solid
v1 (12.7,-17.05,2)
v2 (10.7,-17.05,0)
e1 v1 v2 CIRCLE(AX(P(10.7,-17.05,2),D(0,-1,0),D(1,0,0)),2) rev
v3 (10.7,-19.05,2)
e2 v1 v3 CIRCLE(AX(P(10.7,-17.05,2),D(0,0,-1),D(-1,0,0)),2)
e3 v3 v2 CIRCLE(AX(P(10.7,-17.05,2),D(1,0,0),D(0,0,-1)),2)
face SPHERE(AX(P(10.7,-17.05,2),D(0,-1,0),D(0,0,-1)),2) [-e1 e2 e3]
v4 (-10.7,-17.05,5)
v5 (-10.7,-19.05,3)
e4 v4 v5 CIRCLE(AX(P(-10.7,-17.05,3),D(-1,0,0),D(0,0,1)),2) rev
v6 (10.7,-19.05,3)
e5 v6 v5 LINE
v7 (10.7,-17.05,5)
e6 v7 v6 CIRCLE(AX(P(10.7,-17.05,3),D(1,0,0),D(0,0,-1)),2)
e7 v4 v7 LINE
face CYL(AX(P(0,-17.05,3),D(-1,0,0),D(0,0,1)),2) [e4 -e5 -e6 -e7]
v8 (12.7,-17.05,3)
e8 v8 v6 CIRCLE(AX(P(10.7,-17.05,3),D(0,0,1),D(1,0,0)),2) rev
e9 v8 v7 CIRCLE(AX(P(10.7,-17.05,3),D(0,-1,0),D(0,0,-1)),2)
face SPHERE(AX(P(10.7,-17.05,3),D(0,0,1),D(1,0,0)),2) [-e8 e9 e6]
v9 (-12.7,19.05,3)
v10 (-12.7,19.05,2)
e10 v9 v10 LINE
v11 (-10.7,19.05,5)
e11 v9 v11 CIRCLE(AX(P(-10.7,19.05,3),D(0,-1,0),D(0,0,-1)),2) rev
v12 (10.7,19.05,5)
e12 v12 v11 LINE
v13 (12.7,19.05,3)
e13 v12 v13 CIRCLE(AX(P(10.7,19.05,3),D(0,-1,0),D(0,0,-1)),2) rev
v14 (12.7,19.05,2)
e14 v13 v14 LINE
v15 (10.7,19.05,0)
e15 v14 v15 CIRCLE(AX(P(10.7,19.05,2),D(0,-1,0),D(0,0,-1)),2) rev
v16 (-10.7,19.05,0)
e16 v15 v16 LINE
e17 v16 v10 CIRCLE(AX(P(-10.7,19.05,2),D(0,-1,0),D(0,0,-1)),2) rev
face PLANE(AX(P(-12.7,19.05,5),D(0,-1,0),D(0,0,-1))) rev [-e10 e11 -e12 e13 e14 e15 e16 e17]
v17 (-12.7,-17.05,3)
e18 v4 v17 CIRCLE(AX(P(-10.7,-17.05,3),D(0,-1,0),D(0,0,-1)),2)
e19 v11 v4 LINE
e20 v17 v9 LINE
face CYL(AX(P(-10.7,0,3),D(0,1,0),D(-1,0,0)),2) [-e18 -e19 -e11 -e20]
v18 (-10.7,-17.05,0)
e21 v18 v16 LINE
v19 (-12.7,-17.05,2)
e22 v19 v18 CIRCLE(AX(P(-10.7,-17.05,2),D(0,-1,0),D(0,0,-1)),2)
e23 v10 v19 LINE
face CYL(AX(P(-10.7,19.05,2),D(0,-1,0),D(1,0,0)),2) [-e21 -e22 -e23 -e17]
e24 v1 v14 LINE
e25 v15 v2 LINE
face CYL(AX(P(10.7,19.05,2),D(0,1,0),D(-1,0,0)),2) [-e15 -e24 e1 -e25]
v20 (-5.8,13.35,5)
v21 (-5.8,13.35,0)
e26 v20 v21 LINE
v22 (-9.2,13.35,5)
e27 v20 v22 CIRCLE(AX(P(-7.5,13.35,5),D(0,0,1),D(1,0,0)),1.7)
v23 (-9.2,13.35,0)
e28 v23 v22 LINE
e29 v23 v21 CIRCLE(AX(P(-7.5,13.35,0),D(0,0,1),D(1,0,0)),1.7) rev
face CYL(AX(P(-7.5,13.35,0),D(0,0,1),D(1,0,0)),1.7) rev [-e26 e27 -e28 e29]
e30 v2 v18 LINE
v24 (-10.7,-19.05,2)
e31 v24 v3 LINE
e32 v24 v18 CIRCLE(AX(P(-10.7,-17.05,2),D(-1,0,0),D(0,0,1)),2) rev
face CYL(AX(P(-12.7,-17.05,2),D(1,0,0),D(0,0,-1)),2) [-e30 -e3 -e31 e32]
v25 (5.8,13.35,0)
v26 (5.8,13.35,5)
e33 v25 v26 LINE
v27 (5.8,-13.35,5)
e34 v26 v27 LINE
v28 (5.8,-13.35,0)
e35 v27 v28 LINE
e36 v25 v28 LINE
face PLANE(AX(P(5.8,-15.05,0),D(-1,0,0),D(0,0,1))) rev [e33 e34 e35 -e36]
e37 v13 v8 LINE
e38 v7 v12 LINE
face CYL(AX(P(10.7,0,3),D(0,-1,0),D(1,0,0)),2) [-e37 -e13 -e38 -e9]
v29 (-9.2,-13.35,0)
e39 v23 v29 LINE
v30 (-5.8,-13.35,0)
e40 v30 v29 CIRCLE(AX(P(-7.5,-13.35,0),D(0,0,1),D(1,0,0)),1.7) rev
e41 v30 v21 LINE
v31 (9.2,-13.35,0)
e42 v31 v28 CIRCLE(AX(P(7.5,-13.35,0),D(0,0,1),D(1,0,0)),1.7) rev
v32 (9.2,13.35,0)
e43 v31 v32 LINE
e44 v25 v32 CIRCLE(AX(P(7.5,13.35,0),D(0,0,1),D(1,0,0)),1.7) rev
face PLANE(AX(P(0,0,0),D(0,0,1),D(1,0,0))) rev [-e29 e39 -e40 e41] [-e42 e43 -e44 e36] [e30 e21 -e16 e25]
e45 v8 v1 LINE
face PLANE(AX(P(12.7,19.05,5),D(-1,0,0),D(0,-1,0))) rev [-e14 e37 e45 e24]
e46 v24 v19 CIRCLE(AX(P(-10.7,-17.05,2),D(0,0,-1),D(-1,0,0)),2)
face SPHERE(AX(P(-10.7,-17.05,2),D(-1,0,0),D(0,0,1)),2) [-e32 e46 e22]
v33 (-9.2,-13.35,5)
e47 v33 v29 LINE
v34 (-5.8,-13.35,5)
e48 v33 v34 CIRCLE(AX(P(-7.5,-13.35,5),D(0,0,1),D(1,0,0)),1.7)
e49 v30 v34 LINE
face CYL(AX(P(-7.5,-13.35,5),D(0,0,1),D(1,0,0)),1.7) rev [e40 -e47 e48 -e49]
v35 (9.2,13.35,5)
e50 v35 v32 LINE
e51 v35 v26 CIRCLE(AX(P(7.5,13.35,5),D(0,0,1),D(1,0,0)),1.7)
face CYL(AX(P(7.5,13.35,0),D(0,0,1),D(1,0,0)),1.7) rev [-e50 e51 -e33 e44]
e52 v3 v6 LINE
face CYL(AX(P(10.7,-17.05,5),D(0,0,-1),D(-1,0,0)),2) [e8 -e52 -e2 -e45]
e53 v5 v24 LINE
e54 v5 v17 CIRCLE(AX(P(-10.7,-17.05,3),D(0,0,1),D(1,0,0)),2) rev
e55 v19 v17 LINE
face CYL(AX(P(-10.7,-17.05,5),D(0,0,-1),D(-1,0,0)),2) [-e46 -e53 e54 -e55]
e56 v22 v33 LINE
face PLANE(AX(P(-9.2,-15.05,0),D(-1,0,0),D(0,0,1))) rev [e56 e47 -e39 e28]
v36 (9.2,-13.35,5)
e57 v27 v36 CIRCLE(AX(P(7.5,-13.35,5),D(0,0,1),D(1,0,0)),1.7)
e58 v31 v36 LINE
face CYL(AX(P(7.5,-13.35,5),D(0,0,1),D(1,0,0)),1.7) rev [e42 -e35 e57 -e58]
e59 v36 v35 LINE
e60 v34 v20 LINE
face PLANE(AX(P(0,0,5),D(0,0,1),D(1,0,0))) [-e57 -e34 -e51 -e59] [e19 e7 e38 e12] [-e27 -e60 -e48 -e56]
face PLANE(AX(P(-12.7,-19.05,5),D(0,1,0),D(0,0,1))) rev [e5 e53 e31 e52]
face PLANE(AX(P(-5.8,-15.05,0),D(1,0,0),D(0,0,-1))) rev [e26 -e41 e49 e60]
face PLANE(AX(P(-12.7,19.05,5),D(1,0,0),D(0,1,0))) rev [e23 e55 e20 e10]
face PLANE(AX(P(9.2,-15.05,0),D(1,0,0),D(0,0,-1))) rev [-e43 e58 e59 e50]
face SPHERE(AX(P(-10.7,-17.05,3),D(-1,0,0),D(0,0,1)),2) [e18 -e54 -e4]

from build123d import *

# Parameters (mm, degrees)
SKETCH1_W           = 25.4
SKETCH1_H           = 38.1
BOSS_EXTRUDE1_DEPTH = 5
SKETCH2_W           = 3.4
SKETCH2_H           = 30.1
CUT_EXTRUDE1_DEPTH  = 24.434856518
FILLET1_R           = 1.7
FILLET2_R           = 1.7
FILLET3_R           = 1.7
FILLET4_R           = 1.7
FILLET5_R           = 2


with BuildPart() as part:
    # Sketch1 → Boss-Extrude1 (new body)
    with BuildSketch(Plane.XY):
        Rectangle(SKETCH1_W, SKETCH1_H)
    extrude(amount=BOSS_EXTRUDE1_DEPTH)

    # Sketch2 → Cut-Extrude1 (cut, through all)
    with BuildSketch(Plane.XY.offset(5)):
        with Locations((7.5, 0)):
            Rectangle(SKETCH2_W, SKETCH2_H)
        with Locations((-7.5, 0)):
            Rectangle(SKETCH2_W, SKETCH2_H)
    extrude(amount=-CUT_EXTRUDE1_DEPTH, mode=Mode.SUBTRACT)

    # Fillet1
    fillet1_edges = [part.edges().sort_by_distance(p)[0] for p in [
        (-5.8, 15.05, 2.5),
        (-9.2, 15.05, 2.5),
    ]]
    fillet(fillet1_edges, radius=FILLET1_R - 0.0001)  # a hair under: the kernel refuses the full size

    # Fillet2
    fillet2_edges = [part.edges().sort_by_distance(p)[0] for p in [
        (-5.8, -15.05, 2.5),
        (-9.2, -15.05, 2.5),
    ]]
    fillet(fillet2_edges, radius=FILLET2_R - 0.0001)  # a hair under: the kernel refuses the full size

    # Fillet3
    fillet3_edges = [part.edges().sort_by_distance(p)[0] for p in [
        (9.2, 15.05, 2.5),
        (5.8, 15.05, 2.5),
    ]]
    fillet(fillet3_edges, radius=FILLET3_R - 0.0001)  # a hair under: the kernel refuses the full size

    # Fillet4
    fillet4_edges = [part.edges().sort_by_distance(p)[0] for p in [
        (9.2, -15.05, 2.5),
        (5.8, -15.05, 2.5),
    ]]
    fillet(fillet4_edges, radius=FILLET4_R - 0.0001)  # a hair under: the kernel refuses the full size

    # Fillet5
    fillet5_edges = [part.edges().sort_by_distance(p)[0] for p in [
        (-12.7, 0, 5),
        (0, -19.05, 5),
        (12.7, 0, 5),
        (0, -19.05, 0),
        (-12.7, 0, 0),
        (12.7, 0, 0),
        (12.7, -19.05, 2.5),
        (-12.7, -19.05, 2.5),
    ]]
    fillet(fillet5_edges, radius=FILLET5_R)


solid = part.part
